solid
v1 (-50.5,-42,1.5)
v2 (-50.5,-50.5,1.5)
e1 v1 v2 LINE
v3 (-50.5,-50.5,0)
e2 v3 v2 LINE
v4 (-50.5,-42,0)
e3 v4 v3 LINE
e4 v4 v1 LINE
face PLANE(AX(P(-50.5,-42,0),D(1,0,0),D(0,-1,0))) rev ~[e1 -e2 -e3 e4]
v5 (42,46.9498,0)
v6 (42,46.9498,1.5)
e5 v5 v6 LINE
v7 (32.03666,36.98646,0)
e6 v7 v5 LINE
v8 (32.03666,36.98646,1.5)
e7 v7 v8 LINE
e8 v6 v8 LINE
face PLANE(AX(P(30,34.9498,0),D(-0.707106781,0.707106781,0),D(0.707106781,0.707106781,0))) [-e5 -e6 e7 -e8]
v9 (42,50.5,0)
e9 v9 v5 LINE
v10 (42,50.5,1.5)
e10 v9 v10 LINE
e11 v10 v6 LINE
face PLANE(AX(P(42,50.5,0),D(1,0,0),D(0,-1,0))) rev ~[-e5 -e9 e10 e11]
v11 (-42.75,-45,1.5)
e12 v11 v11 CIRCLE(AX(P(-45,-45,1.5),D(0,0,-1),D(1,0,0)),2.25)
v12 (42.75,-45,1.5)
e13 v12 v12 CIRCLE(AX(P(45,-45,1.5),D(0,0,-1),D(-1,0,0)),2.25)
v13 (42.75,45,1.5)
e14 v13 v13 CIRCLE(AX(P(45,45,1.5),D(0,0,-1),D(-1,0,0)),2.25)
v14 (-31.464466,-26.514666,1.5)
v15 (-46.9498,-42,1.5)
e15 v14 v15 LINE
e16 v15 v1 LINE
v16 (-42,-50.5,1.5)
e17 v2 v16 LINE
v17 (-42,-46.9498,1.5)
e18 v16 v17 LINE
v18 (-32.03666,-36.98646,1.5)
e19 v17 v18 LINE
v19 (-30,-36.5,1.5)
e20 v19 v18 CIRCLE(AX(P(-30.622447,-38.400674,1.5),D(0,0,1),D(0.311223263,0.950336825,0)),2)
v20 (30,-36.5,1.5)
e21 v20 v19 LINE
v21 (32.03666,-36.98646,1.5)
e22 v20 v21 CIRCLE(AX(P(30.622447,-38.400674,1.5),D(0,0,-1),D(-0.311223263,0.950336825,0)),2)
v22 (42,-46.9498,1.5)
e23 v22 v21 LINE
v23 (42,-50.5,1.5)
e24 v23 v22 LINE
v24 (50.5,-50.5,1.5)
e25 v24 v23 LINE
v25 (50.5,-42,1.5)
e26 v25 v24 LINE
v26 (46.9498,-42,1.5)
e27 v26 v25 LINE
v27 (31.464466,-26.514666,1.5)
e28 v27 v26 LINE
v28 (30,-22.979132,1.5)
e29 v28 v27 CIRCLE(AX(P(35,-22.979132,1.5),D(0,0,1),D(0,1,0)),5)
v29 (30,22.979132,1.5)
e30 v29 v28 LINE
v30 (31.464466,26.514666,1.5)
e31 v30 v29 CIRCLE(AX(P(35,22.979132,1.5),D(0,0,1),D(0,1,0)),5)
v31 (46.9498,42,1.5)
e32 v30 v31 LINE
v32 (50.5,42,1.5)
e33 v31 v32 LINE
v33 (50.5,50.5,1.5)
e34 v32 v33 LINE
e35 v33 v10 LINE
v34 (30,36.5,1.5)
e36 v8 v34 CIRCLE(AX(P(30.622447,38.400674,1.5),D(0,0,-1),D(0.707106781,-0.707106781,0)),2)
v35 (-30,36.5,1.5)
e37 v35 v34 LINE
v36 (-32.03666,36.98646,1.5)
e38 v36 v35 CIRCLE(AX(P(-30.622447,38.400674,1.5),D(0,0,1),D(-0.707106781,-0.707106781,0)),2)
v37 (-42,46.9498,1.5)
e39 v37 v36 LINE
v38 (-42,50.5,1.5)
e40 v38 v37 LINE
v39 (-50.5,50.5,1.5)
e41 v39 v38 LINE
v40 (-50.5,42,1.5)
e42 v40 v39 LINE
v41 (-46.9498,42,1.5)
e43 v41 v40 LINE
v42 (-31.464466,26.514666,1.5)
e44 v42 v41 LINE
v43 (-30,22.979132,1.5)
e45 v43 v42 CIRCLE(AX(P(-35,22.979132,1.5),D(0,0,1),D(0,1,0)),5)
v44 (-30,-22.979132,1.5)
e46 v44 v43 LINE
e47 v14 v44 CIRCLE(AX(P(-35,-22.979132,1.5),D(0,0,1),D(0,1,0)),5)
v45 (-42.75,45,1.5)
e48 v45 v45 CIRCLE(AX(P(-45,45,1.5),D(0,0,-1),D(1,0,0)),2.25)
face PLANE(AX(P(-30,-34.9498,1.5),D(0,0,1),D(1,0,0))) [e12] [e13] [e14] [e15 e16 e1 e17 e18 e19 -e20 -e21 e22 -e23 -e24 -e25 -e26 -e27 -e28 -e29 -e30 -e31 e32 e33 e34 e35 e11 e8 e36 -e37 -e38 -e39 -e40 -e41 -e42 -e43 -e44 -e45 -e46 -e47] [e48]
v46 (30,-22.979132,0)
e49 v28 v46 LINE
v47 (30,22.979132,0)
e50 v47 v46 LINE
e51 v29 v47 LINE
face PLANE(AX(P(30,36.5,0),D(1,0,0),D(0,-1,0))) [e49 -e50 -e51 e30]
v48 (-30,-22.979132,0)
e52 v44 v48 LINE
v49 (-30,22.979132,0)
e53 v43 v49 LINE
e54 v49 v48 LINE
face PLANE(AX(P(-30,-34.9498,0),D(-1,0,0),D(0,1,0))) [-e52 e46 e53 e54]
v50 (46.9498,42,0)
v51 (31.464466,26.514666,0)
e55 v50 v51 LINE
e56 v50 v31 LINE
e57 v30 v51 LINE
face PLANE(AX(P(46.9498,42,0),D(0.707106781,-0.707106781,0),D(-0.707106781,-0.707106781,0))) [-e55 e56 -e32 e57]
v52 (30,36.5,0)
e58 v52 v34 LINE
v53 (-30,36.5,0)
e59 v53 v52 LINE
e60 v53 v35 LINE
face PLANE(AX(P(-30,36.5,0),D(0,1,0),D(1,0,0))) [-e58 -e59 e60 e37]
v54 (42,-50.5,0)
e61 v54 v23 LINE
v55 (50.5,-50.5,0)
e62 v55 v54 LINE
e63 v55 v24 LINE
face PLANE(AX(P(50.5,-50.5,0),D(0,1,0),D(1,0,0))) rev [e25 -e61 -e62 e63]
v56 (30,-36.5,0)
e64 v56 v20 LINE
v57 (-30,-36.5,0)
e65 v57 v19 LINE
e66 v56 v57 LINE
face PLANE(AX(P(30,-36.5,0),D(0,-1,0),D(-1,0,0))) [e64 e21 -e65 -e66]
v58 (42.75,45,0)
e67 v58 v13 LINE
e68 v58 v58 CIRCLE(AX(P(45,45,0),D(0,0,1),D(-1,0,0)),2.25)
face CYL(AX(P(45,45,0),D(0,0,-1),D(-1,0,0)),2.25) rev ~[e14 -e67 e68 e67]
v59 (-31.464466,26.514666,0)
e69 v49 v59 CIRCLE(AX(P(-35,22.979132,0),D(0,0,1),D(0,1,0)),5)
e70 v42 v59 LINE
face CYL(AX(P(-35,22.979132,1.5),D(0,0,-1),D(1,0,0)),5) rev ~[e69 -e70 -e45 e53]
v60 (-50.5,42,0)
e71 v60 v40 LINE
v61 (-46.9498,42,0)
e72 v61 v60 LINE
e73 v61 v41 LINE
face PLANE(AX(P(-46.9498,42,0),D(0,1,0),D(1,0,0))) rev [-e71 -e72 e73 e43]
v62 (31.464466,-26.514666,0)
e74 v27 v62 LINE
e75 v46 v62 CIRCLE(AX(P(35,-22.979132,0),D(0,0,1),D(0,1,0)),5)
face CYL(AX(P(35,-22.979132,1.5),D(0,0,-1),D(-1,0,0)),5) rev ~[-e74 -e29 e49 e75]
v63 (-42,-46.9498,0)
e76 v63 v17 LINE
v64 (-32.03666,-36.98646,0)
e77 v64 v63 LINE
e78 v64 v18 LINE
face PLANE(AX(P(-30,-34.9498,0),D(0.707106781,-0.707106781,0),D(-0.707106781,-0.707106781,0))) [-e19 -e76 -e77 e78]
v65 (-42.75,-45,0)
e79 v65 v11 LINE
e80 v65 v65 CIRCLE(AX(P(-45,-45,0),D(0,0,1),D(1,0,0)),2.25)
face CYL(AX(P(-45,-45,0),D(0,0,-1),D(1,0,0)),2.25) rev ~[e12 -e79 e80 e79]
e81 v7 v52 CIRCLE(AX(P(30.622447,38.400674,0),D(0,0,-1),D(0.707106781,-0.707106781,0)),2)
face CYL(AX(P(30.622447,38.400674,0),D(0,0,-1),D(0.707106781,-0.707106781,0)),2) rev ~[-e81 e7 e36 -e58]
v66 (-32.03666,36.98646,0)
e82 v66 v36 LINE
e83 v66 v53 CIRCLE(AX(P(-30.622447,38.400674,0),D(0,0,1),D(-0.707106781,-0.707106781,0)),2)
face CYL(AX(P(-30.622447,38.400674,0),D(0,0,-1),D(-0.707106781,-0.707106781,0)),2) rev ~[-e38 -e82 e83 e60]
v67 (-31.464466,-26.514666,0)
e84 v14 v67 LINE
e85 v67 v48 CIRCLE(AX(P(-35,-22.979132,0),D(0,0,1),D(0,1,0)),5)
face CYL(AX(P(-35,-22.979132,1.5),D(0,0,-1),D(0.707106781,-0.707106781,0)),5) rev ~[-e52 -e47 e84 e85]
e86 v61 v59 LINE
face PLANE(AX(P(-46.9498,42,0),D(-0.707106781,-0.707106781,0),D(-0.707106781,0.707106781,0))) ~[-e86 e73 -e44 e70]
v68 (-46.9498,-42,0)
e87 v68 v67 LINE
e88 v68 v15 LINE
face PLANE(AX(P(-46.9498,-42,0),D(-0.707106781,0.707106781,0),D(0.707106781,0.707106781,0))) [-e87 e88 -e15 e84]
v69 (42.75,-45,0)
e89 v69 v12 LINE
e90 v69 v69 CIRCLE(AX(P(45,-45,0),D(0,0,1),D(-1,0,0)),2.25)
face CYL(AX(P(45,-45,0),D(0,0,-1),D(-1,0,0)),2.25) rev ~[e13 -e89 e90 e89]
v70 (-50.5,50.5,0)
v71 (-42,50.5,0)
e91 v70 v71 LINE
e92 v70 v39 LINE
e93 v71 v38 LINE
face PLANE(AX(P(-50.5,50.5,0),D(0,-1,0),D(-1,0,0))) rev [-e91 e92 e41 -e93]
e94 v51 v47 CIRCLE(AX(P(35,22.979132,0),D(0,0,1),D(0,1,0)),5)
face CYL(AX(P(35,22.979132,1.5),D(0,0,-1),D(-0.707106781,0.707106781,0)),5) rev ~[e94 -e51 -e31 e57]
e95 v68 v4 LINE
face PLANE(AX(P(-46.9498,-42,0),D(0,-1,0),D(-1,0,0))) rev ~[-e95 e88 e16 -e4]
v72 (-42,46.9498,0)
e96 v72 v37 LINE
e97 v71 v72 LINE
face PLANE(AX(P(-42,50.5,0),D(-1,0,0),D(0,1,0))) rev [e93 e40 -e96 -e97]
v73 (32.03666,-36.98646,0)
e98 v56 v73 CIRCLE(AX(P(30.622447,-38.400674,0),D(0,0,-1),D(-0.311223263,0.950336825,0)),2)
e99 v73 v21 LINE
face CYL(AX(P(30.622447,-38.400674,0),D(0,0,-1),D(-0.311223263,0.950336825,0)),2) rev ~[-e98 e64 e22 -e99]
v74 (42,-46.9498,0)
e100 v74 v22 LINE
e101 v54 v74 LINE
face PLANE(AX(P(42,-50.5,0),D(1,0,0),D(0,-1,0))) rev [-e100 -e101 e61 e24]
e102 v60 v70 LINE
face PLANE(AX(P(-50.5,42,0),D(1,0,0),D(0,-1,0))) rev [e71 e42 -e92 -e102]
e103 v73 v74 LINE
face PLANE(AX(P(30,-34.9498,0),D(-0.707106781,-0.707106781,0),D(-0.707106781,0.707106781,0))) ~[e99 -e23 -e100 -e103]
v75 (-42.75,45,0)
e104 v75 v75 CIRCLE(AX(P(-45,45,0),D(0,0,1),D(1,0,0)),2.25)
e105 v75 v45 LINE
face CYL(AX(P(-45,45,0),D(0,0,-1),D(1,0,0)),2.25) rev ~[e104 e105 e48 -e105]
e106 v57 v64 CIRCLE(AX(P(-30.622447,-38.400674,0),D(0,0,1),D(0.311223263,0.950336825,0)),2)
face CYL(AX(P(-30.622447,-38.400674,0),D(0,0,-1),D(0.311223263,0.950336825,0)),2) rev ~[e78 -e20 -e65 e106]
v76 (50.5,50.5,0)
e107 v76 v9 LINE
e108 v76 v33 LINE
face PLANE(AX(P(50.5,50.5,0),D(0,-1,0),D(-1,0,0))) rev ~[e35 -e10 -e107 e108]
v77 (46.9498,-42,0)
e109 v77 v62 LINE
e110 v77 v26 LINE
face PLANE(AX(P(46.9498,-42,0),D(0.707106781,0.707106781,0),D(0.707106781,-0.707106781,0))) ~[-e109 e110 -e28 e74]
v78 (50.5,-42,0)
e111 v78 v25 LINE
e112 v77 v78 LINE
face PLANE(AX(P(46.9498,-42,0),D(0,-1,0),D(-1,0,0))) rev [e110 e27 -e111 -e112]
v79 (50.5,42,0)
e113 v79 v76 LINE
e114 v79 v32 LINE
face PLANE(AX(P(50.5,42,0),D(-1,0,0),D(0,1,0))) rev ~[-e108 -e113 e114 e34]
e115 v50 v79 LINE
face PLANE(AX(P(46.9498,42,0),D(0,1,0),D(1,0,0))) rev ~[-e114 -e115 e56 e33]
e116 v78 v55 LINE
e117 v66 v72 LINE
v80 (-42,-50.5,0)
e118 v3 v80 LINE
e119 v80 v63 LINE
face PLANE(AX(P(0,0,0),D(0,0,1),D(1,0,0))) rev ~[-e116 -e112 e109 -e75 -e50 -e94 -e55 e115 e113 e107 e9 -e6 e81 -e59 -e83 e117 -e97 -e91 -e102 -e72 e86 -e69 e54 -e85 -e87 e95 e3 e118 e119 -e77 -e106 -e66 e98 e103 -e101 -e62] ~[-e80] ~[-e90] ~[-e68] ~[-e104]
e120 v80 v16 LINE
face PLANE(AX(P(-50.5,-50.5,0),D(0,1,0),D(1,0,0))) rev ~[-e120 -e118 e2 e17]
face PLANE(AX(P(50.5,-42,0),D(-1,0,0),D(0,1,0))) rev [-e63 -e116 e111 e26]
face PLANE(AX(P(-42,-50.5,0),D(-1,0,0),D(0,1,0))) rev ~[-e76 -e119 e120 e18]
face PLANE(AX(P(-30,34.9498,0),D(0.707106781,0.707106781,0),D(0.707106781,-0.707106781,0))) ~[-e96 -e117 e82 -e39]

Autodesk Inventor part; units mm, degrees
ref_plane "YZ Plane" through (0, 0, 0) normal (1, 0, 0) x (0, 1, 0)
ref_plane "XZ Plane" through (0, 0, 0) normal (0, 1, 0) x (-1, 0, 0)
ref_plane "XY Plane" through (0, 0, 0) normal (0, 0, 1) x (1, 0, 0)
sketch "Sketch1" plane through (0, 0, 0) normal (0, 0, 1) x (1, 0, 0)
  line L0 (-48, 48) -> (48, 48) construction
  line L1 (48, 48) -> (48, -48) construction
  line L2 (48, -48) -> (-48, -48) construction
  line L3 (-48, -48) -> (-48, 48) construction
  circle A0 centre (-45, 45) radius 2.25
  circle A1 centre (45, 45) radius 2.25
  line L4 (45, 45) -> (-45, 45) construction
  line L5 (-45, 45) -> (-45, -45) construction
  line L6 (-45, -45) -> (45, -45) construction
  line L7 (45, -45) -> (45, 45) construction
  circle A2 centre (45, -45) radius 2.25
  circle A3 centre (-45, -45) radius 2.25
  line L8 (-50.5, -50.5) -> (-42, -50.5)
  line L9 (-42, -50.5) -> (-42, -42)
  line L10 (-42, -42) -> (-50.5, -42)
  line L11 (-50.5, -42) -> (-50.5, -50.5)
  line L12 (0, 0) -> (-48, -48) construction
  line L13 (-30, 36.5) -> (30, 36.5)
  line L14 (30, 36.5) -> (30, -36.5)
  line L15 (30, -36.5) -> (-30, -36.5)
  line L16 (-30, -36.5) -> (-30, 36.5)
  line L17 (-2.4749, 2.4749) -> (2.4749, -2.4749)
  line L18 (2.4749, -2.4749) -> (-42.5251, -47.4749)
  line L19 (-42.5251, -47.4749) -> (-47.4749, -42.5251)
  line L20 (-47.4749, -42.5251) -> (-2.4749, 2.4749)
  line L21 (0, 0) -> (-45, -45) construction
  point P0 (0, 48)
  point P1 (48, 0)
  point P2 (30, 0)
  point P3 (0, 36.5)
  dimension "d0" = 96
  dimension "d1" = 96
  dimension "d2" = 4.5
  dimension "d3" = 4.5
  dimension "d4" = 3
  dimension "d5" = 4.5
  dimension "d6" = 4.5
  dimension "d9" = 3
  dimension "d10" = 3
  dimension "d11" = 60
  dimension "d12" = 73
  dimension "d13" = 7
  dimension "d14" = 0
  dimension "d23" = 5.5
  dimension "d24" = 5.5
extrude "Extrusion1" add sketch "Sketch1" along normal blind 1.5 contours L20 L17 L18 L16 | L16 L13 L14 L15 L18 L17 L20
extrude "Extrusion2" add sketch "Sketch1" along normal blind 1.5 contours A3 L19 | A3 L19 L20 L10 L9 L18 | A3 L19 L18 L9 L8 L11 L10 L20 | L20 L16 L18 L9 L10 | L20 L17 L18 L16 picked at (-45.2318, -44.2867)
extrude "Extrusion3" cut sketch "Sketch1" along normal blind 10 contours A3 L19 | L19 A3
mirror "Mirror1" about plane through (0, 0, 0) normal (1, 0, 0) of "Extrusion2", "Extrusion3"
mirror "Mirror2" about plane through (0, 0, 0) normal (0, 1, 0) of "Extrusion2", "Extrusion3", "Mirror1"
fillet "Fillet1" radius 2 4 edges at (-30, 34.9497, 0.75) (30, 34.9497, 0.75) (30, -34.9497, 0.75) (-30, -34.9497, 0.75)
fillet "Fillet2" radius 5 4 edges at (-30, -25.0503, 0.75) (-30, 25.0503, 0.75) (30, 25.0503, 0.75) (30, -25.0503, 0.75)
properties part number "BattHolder"
